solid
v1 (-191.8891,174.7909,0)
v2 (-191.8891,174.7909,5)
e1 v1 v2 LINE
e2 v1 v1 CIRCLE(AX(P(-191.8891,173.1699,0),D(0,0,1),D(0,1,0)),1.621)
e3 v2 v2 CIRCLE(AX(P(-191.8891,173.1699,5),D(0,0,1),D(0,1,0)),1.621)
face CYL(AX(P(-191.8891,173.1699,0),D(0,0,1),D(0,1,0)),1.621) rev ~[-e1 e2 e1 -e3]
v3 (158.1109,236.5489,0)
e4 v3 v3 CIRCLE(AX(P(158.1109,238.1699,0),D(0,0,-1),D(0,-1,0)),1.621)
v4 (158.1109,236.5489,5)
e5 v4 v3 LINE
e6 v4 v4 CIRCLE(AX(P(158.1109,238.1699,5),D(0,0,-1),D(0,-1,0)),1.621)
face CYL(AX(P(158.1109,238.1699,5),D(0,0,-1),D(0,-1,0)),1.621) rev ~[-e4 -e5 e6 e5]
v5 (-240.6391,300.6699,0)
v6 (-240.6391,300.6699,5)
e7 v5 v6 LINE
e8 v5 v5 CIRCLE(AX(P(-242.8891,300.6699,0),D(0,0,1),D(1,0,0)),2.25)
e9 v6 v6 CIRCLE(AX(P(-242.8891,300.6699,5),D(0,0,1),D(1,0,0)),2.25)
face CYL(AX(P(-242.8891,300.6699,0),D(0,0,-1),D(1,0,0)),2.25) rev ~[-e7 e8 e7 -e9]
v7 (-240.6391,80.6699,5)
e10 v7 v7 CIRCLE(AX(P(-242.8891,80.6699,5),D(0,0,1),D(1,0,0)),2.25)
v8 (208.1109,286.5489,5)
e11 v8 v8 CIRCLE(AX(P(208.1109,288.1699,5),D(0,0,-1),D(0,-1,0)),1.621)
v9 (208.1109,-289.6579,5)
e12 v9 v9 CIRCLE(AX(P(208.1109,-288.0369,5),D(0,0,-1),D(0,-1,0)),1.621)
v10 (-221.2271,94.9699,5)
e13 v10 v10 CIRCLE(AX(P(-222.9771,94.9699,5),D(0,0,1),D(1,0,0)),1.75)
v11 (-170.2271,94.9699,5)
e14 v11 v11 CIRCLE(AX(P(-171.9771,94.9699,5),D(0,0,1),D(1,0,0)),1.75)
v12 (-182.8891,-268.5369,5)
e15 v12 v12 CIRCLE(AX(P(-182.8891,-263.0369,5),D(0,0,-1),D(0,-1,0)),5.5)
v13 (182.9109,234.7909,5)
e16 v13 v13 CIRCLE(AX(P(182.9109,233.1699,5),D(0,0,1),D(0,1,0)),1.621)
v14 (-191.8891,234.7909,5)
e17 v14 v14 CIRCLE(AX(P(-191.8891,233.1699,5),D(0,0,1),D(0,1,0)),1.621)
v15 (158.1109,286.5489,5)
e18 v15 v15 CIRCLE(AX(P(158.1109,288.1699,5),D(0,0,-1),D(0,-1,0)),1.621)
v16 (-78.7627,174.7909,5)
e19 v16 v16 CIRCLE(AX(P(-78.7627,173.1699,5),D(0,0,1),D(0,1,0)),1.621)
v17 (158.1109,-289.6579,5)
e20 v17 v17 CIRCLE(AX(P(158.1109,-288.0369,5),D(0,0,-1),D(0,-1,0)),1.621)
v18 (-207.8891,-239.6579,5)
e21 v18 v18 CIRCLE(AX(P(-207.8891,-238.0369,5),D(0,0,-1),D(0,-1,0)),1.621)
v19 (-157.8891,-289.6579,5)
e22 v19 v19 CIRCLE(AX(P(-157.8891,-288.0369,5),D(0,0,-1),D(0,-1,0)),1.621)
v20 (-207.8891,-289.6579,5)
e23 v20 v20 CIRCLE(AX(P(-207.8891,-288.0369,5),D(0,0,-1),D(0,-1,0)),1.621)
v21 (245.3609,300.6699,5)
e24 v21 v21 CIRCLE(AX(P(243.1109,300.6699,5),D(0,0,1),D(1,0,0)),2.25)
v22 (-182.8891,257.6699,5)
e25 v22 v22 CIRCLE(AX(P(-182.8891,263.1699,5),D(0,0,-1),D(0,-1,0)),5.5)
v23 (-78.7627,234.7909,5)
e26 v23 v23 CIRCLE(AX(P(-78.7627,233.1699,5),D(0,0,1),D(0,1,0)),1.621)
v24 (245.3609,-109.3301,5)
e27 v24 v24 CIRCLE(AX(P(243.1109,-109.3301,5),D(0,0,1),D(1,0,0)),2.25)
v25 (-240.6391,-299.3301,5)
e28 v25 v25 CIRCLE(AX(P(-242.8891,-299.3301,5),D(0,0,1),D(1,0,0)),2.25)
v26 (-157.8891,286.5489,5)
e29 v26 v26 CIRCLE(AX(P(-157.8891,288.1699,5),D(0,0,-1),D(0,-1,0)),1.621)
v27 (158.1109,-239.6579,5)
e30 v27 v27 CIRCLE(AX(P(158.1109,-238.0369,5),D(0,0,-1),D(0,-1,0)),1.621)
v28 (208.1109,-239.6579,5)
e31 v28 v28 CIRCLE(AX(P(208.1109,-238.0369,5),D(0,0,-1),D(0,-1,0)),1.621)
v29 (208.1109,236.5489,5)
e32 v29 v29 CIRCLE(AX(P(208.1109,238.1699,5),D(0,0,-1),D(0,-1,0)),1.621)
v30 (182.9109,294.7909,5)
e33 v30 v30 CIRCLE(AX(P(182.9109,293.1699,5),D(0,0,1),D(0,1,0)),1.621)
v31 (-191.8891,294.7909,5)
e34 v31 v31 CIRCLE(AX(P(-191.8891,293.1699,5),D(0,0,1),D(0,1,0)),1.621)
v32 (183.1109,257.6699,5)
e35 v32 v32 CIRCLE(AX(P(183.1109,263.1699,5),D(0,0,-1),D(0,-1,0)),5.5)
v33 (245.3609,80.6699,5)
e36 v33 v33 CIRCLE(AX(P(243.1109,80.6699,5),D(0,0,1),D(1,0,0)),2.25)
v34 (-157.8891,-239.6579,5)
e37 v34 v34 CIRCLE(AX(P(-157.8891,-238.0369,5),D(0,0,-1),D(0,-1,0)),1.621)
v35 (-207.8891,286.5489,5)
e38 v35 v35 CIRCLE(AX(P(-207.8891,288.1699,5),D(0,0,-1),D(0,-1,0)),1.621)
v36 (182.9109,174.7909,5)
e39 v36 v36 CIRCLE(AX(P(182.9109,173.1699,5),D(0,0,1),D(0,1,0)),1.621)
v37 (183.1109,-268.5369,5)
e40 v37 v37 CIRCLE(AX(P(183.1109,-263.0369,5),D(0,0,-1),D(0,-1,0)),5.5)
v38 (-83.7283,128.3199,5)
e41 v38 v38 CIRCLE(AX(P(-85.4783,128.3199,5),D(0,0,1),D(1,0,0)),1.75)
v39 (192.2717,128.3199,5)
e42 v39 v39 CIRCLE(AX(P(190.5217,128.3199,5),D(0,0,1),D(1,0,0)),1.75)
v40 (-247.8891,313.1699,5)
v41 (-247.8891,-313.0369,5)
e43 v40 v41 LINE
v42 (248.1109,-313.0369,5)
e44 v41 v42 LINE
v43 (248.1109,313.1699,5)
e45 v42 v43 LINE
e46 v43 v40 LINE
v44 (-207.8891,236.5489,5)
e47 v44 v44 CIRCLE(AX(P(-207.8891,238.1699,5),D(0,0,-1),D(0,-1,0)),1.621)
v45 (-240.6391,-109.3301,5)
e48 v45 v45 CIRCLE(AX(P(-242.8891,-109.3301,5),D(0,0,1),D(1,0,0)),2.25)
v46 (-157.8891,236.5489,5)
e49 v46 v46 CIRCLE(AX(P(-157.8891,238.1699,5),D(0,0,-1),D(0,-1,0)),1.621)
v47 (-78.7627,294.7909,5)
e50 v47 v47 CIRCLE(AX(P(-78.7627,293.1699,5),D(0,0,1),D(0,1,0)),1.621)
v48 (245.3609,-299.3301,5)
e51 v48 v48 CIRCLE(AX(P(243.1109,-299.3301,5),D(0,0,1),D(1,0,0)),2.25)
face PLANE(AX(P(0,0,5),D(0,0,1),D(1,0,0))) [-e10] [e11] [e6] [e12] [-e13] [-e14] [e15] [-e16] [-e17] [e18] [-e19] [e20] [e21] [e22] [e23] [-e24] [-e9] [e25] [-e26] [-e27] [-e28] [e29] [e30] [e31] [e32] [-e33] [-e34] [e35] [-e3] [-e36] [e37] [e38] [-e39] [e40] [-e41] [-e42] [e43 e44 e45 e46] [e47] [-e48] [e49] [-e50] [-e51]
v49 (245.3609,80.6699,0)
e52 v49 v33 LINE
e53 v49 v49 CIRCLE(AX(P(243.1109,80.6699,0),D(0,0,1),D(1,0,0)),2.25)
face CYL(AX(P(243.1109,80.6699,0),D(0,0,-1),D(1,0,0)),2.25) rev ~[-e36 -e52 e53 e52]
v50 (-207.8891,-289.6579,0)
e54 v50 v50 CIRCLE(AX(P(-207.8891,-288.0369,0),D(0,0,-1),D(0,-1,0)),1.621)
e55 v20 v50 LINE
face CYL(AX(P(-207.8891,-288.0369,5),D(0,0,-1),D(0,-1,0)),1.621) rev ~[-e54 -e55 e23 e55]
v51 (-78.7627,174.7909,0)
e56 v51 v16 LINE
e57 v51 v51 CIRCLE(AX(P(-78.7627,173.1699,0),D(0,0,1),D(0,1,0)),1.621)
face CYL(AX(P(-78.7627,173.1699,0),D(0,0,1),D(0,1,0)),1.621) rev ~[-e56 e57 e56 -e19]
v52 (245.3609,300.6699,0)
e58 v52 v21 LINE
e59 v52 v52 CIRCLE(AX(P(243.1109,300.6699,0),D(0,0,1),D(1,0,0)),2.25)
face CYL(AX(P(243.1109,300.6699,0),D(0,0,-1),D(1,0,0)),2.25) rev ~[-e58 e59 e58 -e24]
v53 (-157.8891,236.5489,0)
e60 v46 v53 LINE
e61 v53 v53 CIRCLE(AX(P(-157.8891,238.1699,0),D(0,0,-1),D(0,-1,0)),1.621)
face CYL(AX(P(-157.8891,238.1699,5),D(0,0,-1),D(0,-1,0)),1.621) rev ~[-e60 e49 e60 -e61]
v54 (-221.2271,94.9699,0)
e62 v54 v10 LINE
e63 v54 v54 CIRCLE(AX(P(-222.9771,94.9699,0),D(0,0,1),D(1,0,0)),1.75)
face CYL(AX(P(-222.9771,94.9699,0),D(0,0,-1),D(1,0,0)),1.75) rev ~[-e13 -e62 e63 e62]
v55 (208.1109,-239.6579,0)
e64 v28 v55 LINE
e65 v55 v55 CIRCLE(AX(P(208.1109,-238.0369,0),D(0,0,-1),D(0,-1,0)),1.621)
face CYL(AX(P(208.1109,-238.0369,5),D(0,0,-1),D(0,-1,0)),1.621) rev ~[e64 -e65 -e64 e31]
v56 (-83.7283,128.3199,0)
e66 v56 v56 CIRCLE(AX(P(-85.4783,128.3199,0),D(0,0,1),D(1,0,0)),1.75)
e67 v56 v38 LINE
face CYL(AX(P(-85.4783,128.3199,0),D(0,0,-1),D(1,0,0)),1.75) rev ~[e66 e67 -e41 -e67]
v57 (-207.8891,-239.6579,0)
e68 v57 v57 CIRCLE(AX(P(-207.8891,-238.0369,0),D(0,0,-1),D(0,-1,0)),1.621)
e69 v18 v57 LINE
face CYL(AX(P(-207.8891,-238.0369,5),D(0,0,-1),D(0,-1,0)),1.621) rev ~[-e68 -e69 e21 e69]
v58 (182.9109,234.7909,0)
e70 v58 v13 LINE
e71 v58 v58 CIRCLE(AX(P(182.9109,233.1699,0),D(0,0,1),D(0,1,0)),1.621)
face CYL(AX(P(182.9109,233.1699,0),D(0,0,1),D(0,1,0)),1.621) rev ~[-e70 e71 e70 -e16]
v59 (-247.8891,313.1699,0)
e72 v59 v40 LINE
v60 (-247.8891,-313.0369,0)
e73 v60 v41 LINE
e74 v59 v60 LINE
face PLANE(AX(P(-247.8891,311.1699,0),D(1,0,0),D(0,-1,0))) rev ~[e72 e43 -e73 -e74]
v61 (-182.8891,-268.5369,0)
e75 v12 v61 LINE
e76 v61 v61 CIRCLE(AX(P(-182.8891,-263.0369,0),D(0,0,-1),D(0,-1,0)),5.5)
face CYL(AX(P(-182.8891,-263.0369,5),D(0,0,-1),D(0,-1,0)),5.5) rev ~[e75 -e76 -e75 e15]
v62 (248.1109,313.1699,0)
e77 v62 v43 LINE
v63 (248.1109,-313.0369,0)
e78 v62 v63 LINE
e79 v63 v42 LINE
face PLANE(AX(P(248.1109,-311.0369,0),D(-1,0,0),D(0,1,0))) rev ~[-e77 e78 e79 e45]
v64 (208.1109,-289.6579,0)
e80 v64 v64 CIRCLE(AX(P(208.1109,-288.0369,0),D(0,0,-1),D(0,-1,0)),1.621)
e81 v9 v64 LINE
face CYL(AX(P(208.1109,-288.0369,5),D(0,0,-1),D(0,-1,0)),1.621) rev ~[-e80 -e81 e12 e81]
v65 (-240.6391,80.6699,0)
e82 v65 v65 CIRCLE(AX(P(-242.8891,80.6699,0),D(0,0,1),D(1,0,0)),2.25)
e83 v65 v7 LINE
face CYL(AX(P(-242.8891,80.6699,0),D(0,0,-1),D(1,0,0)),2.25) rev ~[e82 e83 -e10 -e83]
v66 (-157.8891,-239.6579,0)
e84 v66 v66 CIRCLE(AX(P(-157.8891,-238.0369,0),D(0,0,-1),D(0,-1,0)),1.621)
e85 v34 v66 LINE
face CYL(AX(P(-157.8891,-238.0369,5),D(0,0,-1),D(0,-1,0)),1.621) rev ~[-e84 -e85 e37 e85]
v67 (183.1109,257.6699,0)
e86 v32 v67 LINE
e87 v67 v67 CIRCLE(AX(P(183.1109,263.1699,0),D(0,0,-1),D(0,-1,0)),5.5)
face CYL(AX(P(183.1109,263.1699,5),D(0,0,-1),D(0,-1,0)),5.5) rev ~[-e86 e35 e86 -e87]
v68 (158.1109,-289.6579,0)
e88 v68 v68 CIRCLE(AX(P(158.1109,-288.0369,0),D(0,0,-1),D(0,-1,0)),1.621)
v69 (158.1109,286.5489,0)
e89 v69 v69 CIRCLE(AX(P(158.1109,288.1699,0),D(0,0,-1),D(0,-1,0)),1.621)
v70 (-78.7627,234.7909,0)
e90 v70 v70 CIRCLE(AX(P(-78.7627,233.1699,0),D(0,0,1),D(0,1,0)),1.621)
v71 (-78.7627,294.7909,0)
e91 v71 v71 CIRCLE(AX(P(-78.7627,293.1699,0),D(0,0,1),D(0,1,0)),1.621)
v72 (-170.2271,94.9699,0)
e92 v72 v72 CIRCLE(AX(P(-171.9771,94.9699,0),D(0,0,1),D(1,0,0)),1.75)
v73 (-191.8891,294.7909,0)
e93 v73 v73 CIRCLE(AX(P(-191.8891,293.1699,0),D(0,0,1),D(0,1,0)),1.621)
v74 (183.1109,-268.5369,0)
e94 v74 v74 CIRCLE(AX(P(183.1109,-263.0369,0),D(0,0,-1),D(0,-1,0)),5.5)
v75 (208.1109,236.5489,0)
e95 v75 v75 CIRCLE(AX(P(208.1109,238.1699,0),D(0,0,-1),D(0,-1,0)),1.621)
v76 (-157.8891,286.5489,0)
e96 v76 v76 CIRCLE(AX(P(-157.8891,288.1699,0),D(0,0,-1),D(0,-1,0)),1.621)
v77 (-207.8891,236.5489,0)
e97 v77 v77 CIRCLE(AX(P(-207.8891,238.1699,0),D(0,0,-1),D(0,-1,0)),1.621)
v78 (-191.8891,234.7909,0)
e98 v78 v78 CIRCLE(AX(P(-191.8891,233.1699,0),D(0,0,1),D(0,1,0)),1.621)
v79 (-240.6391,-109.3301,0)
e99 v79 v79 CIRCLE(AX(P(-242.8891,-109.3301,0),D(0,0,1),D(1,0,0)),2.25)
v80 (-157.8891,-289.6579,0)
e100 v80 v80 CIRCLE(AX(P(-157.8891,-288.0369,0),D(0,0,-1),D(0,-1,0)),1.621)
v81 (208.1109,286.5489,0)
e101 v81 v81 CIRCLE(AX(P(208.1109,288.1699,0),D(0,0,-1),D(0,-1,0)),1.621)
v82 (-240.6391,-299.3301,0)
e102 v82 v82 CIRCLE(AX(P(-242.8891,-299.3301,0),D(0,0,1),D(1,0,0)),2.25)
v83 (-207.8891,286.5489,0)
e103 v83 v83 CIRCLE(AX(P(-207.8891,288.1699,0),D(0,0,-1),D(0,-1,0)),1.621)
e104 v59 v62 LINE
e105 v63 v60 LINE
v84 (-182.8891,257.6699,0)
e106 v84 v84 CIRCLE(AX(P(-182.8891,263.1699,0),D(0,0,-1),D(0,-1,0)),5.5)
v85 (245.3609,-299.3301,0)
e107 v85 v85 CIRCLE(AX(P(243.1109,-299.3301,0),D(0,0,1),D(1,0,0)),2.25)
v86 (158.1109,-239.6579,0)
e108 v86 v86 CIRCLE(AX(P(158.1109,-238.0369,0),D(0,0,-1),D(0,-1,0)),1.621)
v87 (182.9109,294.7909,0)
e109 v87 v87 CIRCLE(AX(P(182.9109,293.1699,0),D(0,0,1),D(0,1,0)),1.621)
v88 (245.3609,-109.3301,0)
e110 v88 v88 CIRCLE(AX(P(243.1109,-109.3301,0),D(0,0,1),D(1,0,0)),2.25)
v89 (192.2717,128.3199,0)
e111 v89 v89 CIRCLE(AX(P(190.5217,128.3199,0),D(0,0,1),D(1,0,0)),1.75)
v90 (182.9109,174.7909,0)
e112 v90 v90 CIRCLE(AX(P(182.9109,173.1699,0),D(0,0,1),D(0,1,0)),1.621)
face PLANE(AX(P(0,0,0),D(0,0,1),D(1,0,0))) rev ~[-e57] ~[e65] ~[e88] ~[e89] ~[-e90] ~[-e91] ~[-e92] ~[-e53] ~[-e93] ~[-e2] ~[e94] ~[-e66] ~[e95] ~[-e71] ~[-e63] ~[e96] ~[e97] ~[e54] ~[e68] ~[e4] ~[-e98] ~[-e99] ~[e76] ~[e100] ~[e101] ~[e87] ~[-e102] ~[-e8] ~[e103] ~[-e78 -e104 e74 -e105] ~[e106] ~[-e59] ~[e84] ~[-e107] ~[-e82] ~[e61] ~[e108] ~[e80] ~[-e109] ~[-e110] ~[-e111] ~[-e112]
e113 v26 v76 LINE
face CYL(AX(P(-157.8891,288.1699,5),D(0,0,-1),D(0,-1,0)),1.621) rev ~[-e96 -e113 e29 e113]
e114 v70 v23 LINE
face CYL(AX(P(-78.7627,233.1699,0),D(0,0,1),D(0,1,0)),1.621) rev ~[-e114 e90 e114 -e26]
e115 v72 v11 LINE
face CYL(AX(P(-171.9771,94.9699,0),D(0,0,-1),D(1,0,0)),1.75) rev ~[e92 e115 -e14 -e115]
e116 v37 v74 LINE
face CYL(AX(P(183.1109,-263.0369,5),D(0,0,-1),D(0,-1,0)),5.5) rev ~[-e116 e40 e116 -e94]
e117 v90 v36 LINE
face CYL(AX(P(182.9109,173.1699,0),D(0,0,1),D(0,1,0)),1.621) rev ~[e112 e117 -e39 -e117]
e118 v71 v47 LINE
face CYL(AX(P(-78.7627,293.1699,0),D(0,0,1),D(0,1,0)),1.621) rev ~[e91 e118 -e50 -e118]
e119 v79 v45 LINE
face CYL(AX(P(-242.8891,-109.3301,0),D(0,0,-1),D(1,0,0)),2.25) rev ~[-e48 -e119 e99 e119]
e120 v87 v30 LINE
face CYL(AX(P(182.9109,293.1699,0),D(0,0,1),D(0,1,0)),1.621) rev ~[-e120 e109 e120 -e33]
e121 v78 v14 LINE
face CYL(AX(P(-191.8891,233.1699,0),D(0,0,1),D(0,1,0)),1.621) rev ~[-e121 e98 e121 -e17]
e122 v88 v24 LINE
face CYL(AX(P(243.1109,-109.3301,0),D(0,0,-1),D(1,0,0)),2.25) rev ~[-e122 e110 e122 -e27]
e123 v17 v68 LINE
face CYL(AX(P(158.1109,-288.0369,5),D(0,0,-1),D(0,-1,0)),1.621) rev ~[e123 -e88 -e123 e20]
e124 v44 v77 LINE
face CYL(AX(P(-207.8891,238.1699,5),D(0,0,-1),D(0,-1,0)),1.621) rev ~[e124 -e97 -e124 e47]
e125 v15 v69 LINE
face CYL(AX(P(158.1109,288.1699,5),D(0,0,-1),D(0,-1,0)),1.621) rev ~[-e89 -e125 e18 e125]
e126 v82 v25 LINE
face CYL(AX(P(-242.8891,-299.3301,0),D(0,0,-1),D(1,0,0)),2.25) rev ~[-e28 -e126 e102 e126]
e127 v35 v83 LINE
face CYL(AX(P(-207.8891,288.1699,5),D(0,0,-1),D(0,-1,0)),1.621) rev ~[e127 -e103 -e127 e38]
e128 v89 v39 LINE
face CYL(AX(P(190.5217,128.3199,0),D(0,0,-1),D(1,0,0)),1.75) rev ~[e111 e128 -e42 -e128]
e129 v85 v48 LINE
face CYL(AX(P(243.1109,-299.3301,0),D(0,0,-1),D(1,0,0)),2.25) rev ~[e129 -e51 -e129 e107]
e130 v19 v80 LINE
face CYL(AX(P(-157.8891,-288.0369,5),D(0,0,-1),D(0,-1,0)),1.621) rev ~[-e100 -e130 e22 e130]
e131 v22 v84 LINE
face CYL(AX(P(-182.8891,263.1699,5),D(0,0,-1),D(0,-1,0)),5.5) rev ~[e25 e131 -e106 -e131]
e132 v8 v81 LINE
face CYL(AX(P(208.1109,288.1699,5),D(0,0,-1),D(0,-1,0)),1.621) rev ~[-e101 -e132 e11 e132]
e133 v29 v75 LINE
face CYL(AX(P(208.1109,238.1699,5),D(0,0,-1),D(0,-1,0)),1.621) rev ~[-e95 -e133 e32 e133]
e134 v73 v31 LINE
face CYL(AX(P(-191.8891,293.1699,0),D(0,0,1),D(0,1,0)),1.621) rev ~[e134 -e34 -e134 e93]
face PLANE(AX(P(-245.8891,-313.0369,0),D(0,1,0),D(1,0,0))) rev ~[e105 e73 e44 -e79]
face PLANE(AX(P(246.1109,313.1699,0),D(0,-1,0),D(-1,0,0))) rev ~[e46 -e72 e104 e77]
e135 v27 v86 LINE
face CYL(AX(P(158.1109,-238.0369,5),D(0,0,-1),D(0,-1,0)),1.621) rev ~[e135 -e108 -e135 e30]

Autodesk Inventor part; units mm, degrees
ref_plane "YZ Plane" through (0, 0, 0) normal (1, 0, 0) x (0, 1, 0)
ref_plane "XZ Plane" through (0, 0, 0) normal (0, 1, 0) x (-1, 0, 0)
ref_plane "XY Plane" through (0, 0, 0) normal (0, 0, 1) x (1, 0, 0)
sketch "Esboço1" plane through (0, 0, 0) normal (0, 0, 1) x (1, 0, 0)
  circle A0 centre (190.5217, 128.3199) radius 1.75
  circle A1 centre (-85.4783, 128.3199) radius 1.75
  circle A2 centre (-222.9771, 94.9699) radius 1.75
  circle A3 centre (-171.9771, 94.9699) radius 1.75
  circle A4 centre (-187.8891, -248.0369) radius 1.2295
  circle A5 centre (-187.8891, -233.0369) radius 1.2295
  circle A6 centre (-202.8891, -233.0369) radius 1.2295
  circle A7 centre (-202.8891, -248.0369) radius 1.2295
  circle A8 centre (188.1109, -248.0369) radius 1.2295
  circle A9 centre (203.1109, -248.0369) radius 1.2295
  circle A10 centre (188.1109, -233.0369) radius 1.2295
  circle A11 centre (203.1109, -233.0369) radius 1.2295
  circle A12 centre (203.1109, 298.1699) radius 1.2295
  circle A13 centre (188.1109, 298.1699) radius 1.2295
  circle A14 centre (188.1109, 283.1699) radius 1.2295
  circle A15 centre (203.1109, 283.1699) radius 1.2295
  circle A16 centre (-202.8891, 298.1699) radius 1.2295
  circle A17 centre (-187.8891, 298.1699) radius 1.2295
  circle A18 centre (-187.8891, 283.1699) radius 1.2295
  circle A19 centre (-202.8891, 283.1699) radius 1.2295
  line L0 (-169.1391, 123.1699) -> (-192.8891, 123.1699)
  line L1 (-192.8891, 123.1699) -> (-192.8891, 273.1699)
  line L2 (-192.8891, 273.1699) -> (-169.1391, 273.1699)
  line L3 (-169.1391, 273.1699) -> (-169.1391, 271.6699)
  line L4 (-169.1391, 271.6699) -> (-169.8891, 271.6699)
  line L5 (-169.8891, 271.6699) -> (-169.8891, 124.6699)
  line L6 (-169.8891, 124.6699) -> (-169.1391, 124.6699)
  line L7 (-169.1391, 124.6699) -> (-169.1391, 123.1699)
  line L8 (161.1979, 273.1699) -> (194.9479, 273.1699)
  line L9 (194.9479, 273.1699) -> (194.9479, 153.1699)
  line L10 (194.9479, 153.1699) -> (161.1979, 153.1699)
  line L11 (161.1979, 153.1699) -> (161.1979, 154.6699)
  line L12 (161.1979, 154.6699) -> (161.9479, 154.6699)
  line L13 (161.9479, 154.6699) -> (161.9479, 271.6699)
  line L14 (161.9479, 271.6699) -> (161.1979, 271.6699)
  line L15 (161.1979, 271.6699) -> (161.1979, 273.1699)
  arc A20 (248.1109, 311.1699) -> (246.1109, 313.1699) centre (246.1109, 311.1699) ccw
  line L16 (246.1109, 313.1699) -> (-245.8891, 313.1699)
  arc A21 (-245.8891, 313.1699) -> (-247.8891, 311.1699) centre (-245.8891, 311.1699) ccw
  line L17 (-247.8891, 311.1699) -> (-247.8891, -311.0369)
  arc A22 (-247.8891, -311.0369) -> (-245.8891, -313.0369) centre (-245.8891, -311.0369) ccw
  line L18 (-245.8891, -313.0369) -> (246.1109, -313.0369)
  arc A23 (246.1109, -313.0369) -> (248.1109, -311.0369) centre (246.1109, -311.0369) ccw
  line L19 (248.1109, -311.0369) -> (248.1109, 311.1699)
  circle A24 centre (-242.8891, 300.6699) radius 2.25
  circle A25 centre (243.1109, 300.6699) radius 2.25
  circle A26 centre (243.1109, 80.6699) radius 2.25
  circle A27 centre (243.1109, -299.3301) radius 2.25
  circle A28 centre (243.1109, -109.3301) radius 2.25
  circle A29 centre (-242.8891, -299.3301) radius 2.25
  circle A30 centre (-242.8891, -109.3301) radius 2.25
  circle A31 centre (-242.8891, 80.6699) radius 2.25
  line L20 (-58.9757, 153.1699) -> (-92.7257, 153.1699)
  line L21 (-92.7257, 153.1699) -> (-92.7257, 273.1699)
  line L22 (-92.7257, 273.1699) -> (-58.9757, 273.1699)
  line L23 (-58.9757, 273.1699) -> (-58.9757, 271.6699)
  line L24 (-58.9757, 271.6699) -> (-59.7257, 271.6699)
  line L25 (-59.7257, 271.6699) -> (-59.7257, 154.6699)
  line L26 (-59.7257, 154.6699) -> (-58.9757, 154.6699)
  line L27 (-58.9757, 154.6699) -> (-58.9757, 153.1699)
  line L28 (-231.6391, 273.1699) -> (-207.8891, 273.1699)
  line L29 (-207.8891, 273.1699) -> (-207.8891, 123.1699)
  line L30 (-207.8891, 123.1699) -> (-231.6391, 123.1699)
  line L31 (-231.6391, 123.1699) -> (-231.6391, 124.6699)
  line L32 (-231.6391, 124.6699) -> (-230.8891, 124.6699)
  line L33 (-230.8891, 124.6699) -> (-230.8891, 271.6699)
  line L34 (-230.8891, 271.6699) -> (-231.6391, 271.6699)
  line L35 (-231.6391, 271.6699) -> (-231.6391, 273.1699)
  point P0 (0, 0)
  point P1 (0.1552, -0.6774)
extrude "Extrusão1" add sketch "Esboço1" along normal blind 5 contours L0 L1 L2 L3 L4 L5 L6 L7 | L8 L9 L10 L11 L12 L13 L14 L15 | L19 A23 L18 A22 L17 A21 L16 A20 | L20 L21 L22 L23 L24 L25 L26 L27 | L28 L29 L30 L31 L32 L33 L34 L35
sketch "Esboço2" plane through (0, 0, 5) normal (0, 0, 1) x (1, 0, 0)
  line L0 (-211.7911, 303.4234) -> (-174.448, 303.4234)
  line L1 (-174.448, 303.4234) -> (-174.448, 277.9622)
  line L2 (-174.448, 277.9622) -> (-211.7911, 277.9622)
  line L3 (-211.7911, 277.9622) -> (-211.7911, 303.4234)
  line L4 (182.3897, 303.4234) -> (210.1357, 303.4234)
  line L5 (210.1357, 303.4234) -> (210.1357, 274.1618)
  line L6 (210.1357, 274.1618) -> (182.3897, 274.1618)
  line L7 (182.3897, 274.1618) -> (182.3897, 303.4234)
  line L8 (177.2667, -226.9528) -> (217.1375, -226.9528)
  line L9 (217.1375, -226.9528) -> (217.1375, -258.9103)
  line L10 (217.1375, -258.9103) -> (177.2667, -258.9103)
  line L11 (177.2667, -258.9103) -> (177.2667, -226.9528)
  line L12 (-216.7412, -223.4538) -> (-174.448, -223.4538)
  line L13 (-174.448, -223.4538) -> (-174.448, -261.7205)
  line L14 (-174.448, -261.7205) -> (-216.7412, -261.7205)
  line L15 (-216.7412, -261.7205) -> (-216.7412, -223.4538)
  point P0 (0, 0)
extrude "Extrusão2" add sketch "Esboço2" against normal blind 5
sketch "Esboço3" plane through (0, 0, 5) normal (0, 0, 1) x (1, 0, 0)
  line L0 (246.1109, 313.1699) -> (-245.8891, 313.1699) projected
  line L1 (-247.8891, 311.1699) -> (-247.8891, -311.0369) projected
  line L2 (0.1109, 313.1699) -> (0.1109, -313.0369)
  line L3 (-245.8891, -313.0369) -> (246.1109, -313.0369) projected
  line L4 (248.1109, -311.0369) -> (248.1109, 311.1699) projected
  line L5 (248.1109, 0.0665) -> (-247.8891, 0.0665)
  line L6 (248.1109, 311.1699) -> (248.1109, -311.0369)
  point P0 (0, 0)
  point P1 (-207.8891, 288.1699)
  point P2 (-157.8891, 288.1699)
  point P3 (-207.8891, 238.1699)
  point P4 (-157.8891, 238.1699)
  point P5 (208.1109, 288.1699)
  point P6 (158.1109, 288.1699)
  point P7 (208.1109, 238.1699)
  point P8 (158.1109, 238.1699)
  point P9 (-207.8891, -288.0369)
  point P10 (-157.8891, -288.0369)
  point P11 (-207.8891, -238.0369)
  point P12 (-157.8891, -238.0369)
  point P13 (158.1109, -238.0369)
  point P14 (208.1109, -238.0369)
  point P15 (158.1109, -288.0369)
  point P16 (208.1109, -288.0369)
  dimension "d4" = 50
  dimension "d5" = 25
  dimension "d6" = 40
  dimension "d7" = 50
  dimension "d8" = 50
  dimension "d9" = 0
  dimension "d10" = 50
  dimension "d11" = 40
hole "Furo1" at (-207.8891, 288.1699, 5) at (-157.8891, 288.1699, 5) at (-207.8891, 238.1699, 5) at (-157.8891, 238.1699, 5) at (158.1109, 238.1699, 5) at (208.1109, 238.1699, 5) at (158.1109, 288.1699, 5) at (208.1109, 288.1699, 5) at (-157.8891, -238.0369, 5) at (-207.8891, -238.0369, 5) at (-157.8891, -288.0369, 5) at (-207.8891, -288.0369, 5) at (208.1109, -288.0369, 5) at (158.1109, -288.0369, 5) at (208.1109, -238.0369, 5) at (158.1109, -238.0369, 5) direction (0, 0, -1) diameter 3.242 end through all thread size "M4x0.7" class "6H" standard "ISO Metric profile"
sketch "Esboço6" plane through (0, 0, 5) normal (0, 0, 1) x (1, 0, 0)
  circle A0 centre (183.1109, 263.1699) radius 4.188 projected
  circle A1 centre (-182.8891, 263.1699) radius 4.188 projected
  circle A2 centre (-182.8891, -263.0369) radius 4.188 projected
  circle A3 centre (183.1109, -263.0369) radius 4.188 projected
  point P0 (0, 0)
hole "Furo2" at (183.1109, -263.0369, 5) at (-182.8891, -263.0369, 5) at (183.1109, 263.1699, 5) at (-182.8891, 263.1699, 5) direction (0, 0, -1) diameter 11 end through all clearance for "Countersunk Flat Head Screw ISO 2009/7046" size "M10" standard "ISO"
sketch "Esboço7" plane through (0, 0, 0) normal (0, 0, -1) x (-1, 0, 0)
  circle A0 centre (191.8891, 233.1699) radius 4.7 construction
  circle A1 centre (191.8891, 293.1699) radius 4.7 construction
  circle A2 centre (191.8891, 173.1699) radius 4.7 construction
  line L0 (226.8891, 160.1699) -> (224.8891, 158.1699) construction
  line L1 (226.8891, 160.1699) -> (226.8891, 306.1699) construction
  line L2 (224.8891, 308.1699) -> (226.8891, 306.1699) construction
  line L3 (224.8891, 308.1699) -> (158.8891, 308.1699) construction
  line L4 (156.8891, 306.1699) -> (158.8891, 308.1699) construction
  line L5 (156.8891, 306.1699) -> (156.8891, 160.1699) construction
  line L6 (158.8891, 158.1699) -> (156.8891, 160.1699) construction
  line L7 (158.8891, 158.1699) -> (224.8891, 158.1699) construction
  circle A3 centre (78.7627, 233.1699) radius 4.7 construction
  circle A4 centre (78.7627, 293.1699) radius 4.7 construction
  circle A5 centre (78.7627, 173.1699) radius 4.7 construction
  line L8 (113.7627, 160.1699) -> (111.7627, 158.1699) construction
  line L9 (113.7627, 160.1699) -> (113.7627, 306.1699) construction
  line L10 (111.7627, 308.1699) -> (113.7627, 306.1699) construction
  line L11 (111.7627, 308.1699) -> (45.7627, 308.1699) construction
  line L12 (43.7627, 306.1699) -> (45.7627, 308.1699) construction
  line L13 (43.7627, 306.1699) -> (43.7627, 160.1699) construction
  line L14 (45.7627, 158.1699) -> (43.7627, 160.1699) construction
  line L15 (45.7627, 158.1699) -> (111.7627, 158.1699) construction
  circle A6 centre (-182.9109, 233.1699) radius 4.7 construction
  circle A7 centre (-182.9109, 293.1699) radius 4.7 construction
  circle A8 centre (-182.9109, 173.1699) radius 4.7 construction
  line L16 (-147.9109, 160.1699) -> (-149.9109, 158.1699) construction
  line L17 (-147.9109, 160.1699) -> (-147.9109, 306.1699) construction
  line L18 (-149.9109, 308.1699) -> (-147.9109, 306.1699) construction
  line L19 (-149.9109, 308.1699) -> (-215.9109, 308.1699) construction
  line L20 (-217.9109, 306.1699) -> (-215.9109, 308.1699) construction
  line L21 (-217.9109, 306.1699) -> (-217.9109, 160.1699) construction
  line L22 (-215.9109, 158.1699) -> (-217.9109, 160.1699) construction
  line L23 (-215.9109, 158.1699) -> (-149.9109, 158.1699) construction
  point P0 (0, 0)
hole "Furo3" at (182.9109, 293.1699, 0) at (182.9109, 233.1699, 0) at (182.9109, 173.1699, 0) at (-78.7627, 293.1699, 0) at (-78.7627, 233.1699, 0) at (-78.7627, 173.1699, 0) at (-191.8891, 293.1699, 0) at (-191.8891, 233.1699, 0) at (-191.8891, 173.1699, 0) direction (0, 0, 1) diameter 3.242 end through all thread size "M4x0.7" class "6H" standard "ISO Metric profile"
delete faces "Excluir1" heal yes whole lump no faces at (247.9726, 311.9006, 3.3333)
delete faces "Excluir2" heal yes whole lump no faces at (-247.5416, 312.2966, 3.3333)
delete faces "Excluir3" heal yes whole lump no faces at (248.022, -311.6264, 3.3333)
delete faces "Excluir4" heal yes whole lump no faces at (-247.7509, -311.7675, 3.3333)
properties part number "Base do fct bastidor" material "Alumínio 6061"
